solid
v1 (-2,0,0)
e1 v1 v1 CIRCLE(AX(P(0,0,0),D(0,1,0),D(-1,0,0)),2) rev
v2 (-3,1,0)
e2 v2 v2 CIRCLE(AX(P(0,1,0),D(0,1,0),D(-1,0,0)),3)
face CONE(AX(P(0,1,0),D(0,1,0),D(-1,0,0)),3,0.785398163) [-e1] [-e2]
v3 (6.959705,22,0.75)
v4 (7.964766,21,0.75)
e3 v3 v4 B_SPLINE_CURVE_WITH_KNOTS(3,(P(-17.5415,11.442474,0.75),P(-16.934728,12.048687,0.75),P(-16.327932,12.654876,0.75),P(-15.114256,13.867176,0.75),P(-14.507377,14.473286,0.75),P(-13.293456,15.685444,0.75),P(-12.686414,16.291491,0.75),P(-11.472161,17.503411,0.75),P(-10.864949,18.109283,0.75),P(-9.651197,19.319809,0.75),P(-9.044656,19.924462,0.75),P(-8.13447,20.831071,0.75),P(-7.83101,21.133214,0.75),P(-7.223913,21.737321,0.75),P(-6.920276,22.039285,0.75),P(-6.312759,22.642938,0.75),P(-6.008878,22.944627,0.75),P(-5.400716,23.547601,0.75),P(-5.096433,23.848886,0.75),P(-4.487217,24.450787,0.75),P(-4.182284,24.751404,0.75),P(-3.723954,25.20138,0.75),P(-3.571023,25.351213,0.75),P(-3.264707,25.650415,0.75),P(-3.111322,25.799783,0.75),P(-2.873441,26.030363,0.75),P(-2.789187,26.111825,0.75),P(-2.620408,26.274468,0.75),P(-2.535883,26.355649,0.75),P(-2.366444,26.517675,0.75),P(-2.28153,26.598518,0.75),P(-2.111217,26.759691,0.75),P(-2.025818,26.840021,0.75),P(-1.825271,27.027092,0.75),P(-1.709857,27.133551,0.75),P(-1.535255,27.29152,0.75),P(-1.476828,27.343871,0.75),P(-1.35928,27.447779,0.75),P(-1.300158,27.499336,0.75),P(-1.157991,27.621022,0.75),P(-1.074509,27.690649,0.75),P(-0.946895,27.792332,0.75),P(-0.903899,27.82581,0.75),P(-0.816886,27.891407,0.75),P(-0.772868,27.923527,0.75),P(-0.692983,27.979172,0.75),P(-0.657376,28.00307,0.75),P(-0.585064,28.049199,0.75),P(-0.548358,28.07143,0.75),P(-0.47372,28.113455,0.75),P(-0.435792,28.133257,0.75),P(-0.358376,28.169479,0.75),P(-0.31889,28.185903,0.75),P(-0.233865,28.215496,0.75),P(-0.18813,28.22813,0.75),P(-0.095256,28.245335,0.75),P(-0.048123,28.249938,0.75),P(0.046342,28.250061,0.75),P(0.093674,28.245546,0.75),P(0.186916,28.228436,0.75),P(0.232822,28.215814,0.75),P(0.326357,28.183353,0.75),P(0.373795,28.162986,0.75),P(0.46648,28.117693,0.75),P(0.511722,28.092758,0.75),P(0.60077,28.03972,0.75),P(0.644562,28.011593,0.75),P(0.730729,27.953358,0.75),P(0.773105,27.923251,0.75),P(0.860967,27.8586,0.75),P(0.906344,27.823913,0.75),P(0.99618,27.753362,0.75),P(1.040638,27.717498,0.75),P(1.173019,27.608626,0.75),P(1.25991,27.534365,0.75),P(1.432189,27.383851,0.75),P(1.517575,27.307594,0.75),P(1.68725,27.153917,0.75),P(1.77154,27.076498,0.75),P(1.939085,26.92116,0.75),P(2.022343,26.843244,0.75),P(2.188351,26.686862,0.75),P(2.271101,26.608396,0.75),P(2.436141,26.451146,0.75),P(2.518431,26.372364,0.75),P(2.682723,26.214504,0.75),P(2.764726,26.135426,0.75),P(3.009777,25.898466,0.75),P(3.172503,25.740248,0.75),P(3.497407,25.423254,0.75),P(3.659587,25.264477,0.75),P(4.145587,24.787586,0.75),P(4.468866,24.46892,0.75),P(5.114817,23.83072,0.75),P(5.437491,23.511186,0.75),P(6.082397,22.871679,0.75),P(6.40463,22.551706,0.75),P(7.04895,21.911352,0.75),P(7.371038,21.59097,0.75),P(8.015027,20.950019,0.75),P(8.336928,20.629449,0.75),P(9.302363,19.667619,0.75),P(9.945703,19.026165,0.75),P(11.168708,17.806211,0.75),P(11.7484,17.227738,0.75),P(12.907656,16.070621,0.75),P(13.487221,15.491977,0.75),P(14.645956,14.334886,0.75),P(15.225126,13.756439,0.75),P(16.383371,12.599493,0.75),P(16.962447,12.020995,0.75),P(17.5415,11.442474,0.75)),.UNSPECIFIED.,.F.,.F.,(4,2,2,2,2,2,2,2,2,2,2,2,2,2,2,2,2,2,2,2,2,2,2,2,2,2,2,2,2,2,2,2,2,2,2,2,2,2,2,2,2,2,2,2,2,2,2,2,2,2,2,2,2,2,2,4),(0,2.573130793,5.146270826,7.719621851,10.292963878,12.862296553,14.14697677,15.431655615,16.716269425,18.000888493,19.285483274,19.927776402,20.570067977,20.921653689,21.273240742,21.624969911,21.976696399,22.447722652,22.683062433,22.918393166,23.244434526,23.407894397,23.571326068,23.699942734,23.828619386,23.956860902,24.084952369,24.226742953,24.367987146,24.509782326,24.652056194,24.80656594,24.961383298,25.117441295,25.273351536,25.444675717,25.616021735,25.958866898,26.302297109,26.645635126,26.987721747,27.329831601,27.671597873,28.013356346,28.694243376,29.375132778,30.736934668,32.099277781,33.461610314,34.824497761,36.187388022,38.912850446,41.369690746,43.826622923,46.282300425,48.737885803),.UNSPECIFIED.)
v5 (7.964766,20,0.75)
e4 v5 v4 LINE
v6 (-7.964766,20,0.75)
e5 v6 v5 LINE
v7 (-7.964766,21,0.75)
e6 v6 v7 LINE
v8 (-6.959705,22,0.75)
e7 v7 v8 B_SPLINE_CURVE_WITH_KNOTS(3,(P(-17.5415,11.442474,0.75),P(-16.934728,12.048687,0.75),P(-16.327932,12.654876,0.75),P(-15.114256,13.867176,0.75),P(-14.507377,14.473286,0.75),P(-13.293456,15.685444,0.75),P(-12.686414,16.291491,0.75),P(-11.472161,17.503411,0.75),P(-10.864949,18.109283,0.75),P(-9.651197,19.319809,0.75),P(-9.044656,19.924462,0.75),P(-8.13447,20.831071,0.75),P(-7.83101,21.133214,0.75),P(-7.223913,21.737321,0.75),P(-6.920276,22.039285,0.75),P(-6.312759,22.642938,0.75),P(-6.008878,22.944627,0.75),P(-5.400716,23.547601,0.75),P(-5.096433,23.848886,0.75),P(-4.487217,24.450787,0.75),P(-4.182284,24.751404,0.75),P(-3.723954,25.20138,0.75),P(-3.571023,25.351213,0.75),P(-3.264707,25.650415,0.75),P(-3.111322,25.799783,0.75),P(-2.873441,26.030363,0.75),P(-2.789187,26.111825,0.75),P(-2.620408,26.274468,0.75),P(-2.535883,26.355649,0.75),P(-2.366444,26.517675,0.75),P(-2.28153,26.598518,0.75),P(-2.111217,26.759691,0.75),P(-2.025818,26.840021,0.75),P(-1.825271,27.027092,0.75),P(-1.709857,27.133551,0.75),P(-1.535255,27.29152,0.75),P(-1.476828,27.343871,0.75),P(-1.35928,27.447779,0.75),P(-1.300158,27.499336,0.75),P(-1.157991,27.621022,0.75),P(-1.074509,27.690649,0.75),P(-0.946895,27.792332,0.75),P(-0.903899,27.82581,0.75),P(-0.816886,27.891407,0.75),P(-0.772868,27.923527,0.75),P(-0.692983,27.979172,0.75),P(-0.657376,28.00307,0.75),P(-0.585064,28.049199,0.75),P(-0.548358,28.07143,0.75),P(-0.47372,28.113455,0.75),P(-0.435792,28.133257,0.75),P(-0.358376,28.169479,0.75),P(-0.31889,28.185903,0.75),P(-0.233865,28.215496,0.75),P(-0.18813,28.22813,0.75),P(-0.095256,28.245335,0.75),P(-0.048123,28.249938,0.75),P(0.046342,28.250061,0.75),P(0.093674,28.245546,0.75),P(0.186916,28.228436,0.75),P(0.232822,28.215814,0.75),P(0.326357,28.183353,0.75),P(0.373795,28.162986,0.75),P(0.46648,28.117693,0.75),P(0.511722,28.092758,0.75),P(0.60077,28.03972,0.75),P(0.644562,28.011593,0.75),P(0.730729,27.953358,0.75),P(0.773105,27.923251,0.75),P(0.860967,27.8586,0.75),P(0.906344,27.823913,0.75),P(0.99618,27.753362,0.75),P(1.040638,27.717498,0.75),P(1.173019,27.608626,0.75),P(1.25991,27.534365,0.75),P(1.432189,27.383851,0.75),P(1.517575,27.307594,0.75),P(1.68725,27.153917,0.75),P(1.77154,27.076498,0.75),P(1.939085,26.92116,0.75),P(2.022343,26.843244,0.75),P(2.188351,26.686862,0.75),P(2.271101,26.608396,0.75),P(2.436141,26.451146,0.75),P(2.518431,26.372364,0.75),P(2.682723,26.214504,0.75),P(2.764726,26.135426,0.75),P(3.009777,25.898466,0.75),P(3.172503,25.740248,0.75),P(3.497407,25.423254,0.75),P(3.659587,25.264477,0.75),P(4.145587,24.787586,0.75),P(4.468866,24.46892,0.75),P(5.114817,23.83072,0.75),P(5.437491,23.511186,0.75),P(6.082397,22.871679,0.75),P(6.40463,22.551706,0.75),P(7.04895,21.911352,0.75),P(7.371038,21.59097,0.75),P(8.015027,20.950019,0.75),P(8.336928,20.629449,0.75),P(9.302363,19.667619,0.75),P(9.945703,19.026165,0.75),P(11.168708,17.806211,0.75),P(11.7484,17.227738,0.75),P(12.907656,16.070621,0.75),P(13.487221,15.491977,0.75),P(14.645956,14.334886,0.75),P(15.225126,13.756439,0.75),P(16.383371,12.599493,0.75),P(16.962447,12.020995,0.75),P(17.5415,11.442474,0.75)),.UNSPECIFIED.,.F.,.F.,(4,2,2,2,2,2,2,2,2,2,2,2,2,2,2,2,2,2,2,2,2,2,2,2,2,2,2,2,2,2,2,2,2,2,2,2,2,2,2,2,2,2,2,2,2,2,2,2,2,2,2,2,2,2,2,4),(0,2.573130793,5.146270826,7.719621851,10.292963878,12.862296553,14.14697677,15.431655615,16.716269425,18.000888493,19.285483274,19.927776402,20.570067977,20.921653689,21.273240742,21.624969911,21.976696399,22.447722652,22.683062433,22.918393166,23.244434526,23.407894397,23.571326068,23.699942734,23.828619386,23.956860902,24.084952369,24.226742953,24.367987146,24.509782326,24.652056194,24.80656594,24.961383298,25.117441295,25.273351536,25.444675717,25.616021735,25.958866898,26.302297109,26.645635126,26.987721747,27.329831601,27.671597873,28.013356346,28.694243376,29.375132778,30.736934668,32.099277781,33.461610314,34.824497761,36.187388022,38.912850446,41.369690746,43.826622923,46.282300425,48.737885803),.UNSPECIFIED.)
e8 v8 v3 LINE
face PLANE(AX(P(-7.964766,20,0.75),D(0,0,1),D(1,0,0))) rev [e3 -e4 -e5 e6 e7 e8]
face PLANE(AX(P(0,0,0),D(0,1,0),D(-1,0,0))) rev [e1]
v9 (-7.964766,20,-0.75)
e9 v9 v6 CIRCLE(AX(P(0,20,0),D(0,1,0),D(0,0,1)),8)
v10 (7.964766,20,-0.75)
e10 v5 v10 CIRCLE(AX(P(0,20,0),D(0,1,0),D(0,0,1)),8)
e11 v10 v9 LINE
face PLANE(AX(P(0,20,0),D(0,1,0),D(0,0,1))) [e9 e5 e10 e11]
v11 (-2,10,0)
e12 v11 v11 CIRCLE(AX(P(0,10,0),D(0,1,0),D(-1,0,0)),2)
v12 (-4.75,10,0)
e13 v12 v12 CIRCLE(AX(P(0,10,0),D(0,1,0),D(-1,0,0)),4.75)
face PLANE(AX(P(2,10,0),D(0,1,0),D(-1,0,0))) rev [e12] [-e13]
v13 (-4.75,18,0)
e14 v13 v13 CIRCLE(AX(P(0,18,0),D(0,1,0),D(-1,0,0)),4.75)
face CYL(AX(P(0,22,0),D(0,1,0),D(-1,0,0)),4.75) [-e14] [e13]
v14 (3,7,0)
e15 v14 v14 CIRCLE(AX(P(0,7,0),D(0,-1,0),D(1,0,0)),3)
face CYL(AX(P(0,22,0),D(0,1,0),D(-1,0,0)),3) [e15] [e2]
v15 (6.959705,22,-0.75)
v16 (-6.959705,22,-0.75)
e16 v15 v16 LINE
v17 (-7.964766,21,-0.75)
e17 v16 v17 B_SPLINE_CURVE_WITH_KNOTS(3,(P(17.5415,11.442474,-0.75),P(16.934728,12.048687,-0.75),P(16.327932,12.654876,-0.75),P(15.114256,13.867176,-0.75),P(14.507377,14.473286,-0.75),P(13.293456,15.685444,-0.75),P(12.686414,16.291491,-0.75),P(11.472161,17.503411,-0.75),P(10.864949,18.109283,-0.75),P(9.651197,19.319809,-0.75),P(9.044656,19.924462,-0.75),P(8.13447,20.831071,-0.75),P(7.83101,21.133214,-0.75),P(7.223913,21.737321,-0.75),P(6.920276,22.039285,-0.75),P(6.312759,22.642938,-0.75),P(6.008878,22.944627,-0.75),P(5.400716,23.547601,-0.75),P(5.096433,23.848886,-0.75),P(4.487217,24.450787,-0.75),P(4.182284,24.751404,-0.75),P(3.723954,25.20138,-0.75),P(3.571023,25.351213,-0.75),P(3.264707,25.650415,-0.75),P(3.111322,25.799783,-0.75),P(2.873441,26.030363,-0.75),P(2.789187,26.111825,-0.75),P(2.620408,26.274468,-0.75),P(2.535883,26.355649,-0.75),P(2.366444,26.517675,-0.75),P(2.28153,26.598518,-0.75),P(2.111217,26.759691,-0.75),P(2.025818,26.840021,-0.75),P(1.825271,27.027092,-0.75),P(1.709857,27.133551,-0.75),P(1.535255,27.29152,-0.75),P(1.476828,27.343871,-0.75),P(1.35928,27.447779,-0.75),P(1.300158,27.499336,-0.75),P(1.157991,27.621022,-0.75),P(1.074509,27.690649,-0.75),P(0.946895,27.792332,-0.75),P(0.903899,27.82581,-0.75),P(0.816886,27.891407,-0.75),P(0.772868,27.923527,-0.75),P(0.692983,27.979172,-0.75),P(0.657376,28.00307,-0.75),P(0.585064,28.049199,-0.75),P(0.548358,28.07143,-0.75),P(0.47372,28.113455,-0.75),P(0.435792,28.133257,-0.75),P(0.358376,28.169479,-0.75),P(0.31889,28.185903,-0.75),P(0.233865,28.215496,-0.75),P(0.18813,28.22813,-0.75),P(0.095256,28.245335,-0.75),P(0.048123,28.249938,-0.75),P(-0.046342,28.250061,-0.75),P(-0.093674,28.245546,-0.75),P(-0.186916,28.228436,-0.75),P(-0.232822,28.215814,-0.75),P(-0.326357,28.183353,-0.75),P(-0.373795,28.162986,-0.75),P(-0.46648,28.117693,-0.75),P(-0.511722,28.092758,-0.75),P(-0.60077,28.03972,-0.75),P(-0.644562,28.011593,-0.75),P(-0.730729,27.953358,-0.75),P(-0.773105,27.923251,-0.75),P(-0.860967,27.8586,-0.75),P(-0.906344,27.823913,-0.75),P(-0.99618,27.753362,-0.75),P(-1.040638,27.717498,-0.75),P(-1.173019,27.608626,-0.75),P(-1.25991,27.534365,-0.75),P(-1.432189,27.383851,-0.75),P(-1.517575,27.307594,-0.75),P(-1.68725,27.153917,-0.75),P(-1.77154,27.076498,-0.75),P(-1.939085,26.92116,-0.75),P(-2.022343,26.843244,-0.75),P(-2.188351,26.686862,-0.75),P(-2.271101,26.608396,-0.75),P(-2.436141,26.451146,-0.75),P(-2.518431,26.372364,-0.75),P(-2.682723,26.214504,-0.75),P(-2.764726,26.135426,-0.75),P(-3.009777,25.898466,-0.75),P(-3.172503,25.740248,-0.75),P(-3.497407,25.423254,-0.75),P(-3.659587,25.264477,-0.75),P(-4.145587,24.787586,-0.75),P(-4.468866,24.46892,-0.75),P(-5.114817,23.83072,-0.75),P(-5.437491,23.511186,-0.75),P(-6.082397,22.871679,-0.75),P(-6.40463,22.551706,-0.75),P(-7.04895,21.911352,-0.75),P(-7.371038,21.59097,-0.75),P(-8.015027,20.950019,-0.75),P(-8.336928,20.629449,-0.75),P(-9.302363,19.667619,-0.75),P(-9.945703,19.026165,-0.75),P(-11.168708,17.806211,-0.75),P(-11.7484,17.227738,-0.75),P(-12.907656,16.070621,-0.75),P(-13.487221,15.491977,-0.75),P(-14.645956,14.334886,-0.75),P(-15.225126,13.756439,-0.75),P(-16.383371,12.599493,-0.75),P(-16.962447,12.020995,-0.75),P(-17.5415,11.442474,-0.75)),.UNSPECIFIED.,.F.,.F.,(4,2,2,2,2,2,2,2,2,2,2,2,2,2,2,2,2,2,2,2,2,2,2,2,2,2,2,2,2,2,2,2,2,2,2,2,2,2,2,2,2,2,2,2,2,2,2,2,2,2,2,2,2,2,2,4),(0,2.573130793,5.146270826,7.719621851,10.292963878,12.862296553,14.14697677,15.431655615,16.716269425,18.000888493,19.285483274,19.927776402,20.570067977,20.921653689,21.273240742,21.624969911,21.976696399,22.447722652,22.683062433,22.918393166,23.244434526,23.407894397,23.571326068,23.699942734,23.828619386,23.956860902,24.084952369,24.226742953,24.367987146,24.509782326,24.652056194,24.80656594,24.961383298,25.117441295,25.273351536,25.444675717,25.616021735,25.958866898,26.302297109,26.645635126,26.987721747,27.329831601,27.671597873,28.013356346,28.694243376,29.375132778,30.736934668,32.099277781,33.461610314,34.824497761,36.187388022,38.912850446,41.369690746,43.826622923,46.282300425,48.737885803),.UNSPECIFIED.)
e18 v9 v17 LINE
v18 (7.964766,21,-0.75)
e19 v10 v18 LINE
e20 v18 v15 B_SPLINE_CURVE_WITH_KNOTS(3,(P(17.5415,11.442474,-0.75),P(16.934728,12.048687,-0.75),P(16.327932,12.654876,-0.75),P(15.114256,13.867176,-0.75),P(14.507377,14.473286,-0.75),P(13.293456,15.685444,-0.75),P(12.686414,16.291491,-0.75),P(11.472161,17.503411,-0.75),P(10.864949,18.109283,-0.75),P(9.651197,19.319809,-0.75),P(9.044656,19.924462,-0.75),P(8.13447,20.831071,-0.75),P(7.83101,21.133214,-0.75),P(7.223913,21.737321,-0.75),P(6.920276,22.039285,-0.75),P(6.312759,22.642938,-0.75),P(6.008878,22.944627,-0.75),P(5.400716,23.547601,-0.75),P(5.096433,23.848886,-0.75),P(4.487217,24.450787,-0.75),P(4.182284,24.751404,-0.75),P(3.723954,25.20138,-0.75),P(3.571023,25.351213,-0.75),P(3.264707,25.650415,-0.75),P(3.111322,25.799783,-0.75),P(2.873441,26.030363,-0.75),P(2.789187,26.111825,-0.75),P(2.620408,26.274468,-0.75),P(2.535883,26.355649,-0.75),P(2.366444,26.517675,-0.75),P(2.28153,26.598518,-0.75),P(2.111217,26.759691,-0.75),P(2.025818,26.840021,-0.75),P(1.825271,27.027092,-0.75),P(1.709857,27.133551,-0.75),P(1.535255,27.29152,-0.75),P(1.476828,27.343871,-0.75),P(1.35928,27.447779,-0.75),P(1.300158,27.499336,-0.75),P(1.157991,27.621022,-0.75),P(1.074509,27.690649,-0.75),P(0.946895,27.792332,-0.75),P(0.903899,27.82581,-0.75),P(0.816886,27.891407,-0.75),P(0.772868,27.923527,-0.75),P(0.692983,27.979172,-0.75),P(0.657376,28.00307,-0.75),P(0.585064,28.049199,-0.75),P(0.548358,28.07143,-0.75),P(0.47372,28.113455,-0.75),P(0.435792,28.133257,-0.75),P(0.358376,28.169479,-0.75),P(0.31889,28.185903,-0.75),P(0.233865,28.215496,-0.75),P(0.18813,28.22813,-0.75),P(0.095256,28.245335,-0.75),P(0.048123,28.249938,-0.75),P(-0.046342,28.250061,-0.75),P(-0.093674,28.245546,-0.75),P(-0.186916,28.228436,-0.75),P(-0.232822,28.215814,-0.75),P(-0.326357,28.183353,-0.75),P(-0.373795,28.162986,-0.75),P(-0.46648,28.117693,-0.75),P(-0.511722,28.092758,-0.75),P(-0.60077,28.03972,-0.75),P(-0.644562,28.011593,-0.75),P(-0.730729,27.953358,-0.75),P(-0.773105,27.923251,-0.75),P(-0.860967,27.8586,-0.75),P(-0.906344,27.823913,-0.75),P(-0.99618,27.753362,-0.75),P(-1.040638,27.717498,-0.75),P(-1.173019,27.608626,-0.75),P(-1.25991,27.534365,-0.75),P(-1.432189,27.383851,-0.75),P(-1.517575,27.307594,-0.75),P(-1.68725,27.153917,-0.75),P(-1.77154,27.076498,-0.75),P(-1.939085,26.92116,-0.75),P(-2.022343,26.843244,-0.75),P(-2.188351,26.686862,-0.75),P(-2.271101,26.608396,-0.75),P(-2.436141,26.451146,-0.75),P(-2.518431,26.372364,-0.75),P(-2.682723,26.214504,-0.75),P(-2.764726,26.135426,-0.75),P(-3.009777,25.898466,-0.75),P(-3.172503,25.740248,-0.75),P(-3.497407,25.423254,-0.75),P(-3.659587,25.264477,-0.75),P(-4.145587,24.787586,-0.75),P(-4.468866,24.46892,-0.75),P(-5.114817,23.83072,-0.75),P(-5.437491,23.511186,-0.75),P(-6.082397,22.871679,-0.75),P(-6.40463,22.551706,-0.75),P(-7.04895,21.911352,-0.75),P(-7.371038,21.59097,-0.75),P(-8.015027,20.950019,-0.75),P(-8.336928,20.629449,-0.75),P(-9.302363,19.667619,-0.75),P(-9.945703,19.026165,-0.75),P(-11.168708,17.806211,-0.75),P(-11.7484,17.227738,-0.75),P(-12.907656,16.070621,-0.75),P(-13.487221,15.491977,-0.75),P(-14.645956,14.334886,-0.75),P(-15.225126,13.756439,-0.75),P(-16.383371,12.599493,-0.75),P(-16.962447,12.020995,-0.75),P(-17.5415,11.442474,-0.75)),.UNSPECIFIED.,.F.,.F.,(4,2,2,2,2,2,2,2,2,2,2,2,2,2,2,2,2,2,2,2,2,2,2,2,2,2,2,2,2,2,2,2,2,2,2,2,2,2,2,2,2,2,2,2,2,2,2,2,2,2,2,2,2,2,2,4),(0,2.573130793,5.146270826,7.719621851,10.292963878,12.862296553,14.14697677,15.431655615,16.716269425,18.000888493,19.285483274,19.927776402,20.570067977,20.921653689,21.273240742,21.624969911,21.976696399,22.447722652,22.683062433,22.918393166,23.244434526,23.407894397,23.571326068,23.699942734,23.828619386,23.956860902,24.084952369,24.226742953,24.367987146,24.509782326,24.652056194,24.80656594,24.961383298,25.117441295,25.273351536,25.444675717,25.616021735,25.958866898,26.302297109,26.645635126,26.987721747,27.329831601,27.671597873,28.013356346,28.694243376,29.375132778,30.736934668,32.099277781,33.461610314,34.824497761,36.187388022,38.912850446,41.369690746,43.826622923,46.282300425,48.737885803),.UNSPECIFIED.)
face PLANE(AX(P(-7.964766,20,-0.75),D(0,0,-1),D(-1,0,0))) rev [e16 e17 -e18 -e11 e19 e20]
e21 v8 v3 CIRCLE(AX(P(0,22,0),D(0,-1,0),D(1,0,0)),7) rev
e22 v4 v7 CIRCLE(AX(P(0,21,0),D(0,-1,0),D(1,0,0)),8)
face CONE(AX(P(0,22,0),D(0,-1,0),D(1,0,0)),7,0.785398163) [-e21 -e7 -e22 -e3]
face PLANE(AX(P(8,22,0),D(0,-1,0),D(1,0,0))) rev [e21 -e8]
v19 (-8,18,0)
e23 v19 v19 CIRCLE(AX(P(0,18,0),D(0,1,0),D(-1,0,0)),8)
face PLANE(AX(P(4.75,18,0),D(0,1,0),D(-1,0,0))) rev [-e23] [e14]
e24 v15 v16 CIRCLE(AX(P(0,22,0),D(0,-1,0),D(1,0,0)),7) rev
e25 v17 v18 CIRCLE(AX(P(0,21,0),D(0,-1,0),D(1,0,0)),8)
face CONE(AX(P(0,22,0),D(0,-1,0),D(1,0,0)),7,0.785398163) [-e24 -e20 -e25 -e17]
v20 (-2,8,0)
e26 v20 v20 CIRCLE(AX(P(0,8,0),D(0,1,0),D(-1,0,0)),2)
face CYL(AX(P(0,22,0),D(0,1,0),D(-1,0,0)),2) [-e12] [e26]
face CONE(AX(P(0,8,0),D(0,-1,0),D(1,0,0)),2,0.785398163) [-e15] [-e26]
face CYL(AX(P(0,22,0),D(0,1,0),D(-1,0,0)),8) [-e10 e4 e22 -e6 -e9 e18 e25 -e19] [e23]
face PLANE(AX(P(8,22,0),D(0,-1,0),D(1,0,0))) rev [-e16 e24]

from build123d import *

# Parameters (mm, degrees)
CHAMFER_2_SIZE      = 1
CUT_EXTRUDE_1_DEPTH = 2


with BuildPart() as part:
    # 草图1 → 旋转1 (revolve)
    with BuildSketch(Plane.XY, mode=Mode.PRIVATE) as revolve_1_sk:
        Polygon((0, 0), (3, 0), (3, 8), (2, 8), (2, 10), (4.75, 10), (4.75, 18), (8, 18), (8, 22), (0, 22), align=None)
    revolve(revolve_1_sk.sketch.rotate(Axis((0, 22, 0), (0, -1, 0)), 180), axis=Axis((0, 22, 0), (0, -1, 0)))

    # 倒角2
    chamfer_2_edges = [part.edges().sort_by_distance(p)[0] for p in [
        (3, 8, 0),
        (3, 0, 0),
        (8, 22, 0),
    ]]
    chamfer(chamfer_2_edges, length=CHAMFER_2_SIZE - 0.0001)  # a hair under: the kernel refuses the full size

    # 草图2 → 切除-拉伸1 (cut)
    with BuildSketch(Plane(origin=(0, 22, 0), x_dir=(1, 0, 0), z_dir=(0, 1, 0))):
        with BuildLine():
            Line((-7.964766161, -0.75), (7.964766161, -0.75))
            ThreePointArc((7.964766161, -0.75), (8, 0), (7.964766161, 0.75))
            Line((7.964766161, 0.75), (-7.964766161, 0.75))
            ThreePointArc((-7.964766161, 0.75), (-8, 0), (-7.964766161, -0.75))
        make_face()
    extrude(amount=-CUT_EXTRUDE_1_DEPTH, mode=Mode.SUBTRACT)


solid = part.part
